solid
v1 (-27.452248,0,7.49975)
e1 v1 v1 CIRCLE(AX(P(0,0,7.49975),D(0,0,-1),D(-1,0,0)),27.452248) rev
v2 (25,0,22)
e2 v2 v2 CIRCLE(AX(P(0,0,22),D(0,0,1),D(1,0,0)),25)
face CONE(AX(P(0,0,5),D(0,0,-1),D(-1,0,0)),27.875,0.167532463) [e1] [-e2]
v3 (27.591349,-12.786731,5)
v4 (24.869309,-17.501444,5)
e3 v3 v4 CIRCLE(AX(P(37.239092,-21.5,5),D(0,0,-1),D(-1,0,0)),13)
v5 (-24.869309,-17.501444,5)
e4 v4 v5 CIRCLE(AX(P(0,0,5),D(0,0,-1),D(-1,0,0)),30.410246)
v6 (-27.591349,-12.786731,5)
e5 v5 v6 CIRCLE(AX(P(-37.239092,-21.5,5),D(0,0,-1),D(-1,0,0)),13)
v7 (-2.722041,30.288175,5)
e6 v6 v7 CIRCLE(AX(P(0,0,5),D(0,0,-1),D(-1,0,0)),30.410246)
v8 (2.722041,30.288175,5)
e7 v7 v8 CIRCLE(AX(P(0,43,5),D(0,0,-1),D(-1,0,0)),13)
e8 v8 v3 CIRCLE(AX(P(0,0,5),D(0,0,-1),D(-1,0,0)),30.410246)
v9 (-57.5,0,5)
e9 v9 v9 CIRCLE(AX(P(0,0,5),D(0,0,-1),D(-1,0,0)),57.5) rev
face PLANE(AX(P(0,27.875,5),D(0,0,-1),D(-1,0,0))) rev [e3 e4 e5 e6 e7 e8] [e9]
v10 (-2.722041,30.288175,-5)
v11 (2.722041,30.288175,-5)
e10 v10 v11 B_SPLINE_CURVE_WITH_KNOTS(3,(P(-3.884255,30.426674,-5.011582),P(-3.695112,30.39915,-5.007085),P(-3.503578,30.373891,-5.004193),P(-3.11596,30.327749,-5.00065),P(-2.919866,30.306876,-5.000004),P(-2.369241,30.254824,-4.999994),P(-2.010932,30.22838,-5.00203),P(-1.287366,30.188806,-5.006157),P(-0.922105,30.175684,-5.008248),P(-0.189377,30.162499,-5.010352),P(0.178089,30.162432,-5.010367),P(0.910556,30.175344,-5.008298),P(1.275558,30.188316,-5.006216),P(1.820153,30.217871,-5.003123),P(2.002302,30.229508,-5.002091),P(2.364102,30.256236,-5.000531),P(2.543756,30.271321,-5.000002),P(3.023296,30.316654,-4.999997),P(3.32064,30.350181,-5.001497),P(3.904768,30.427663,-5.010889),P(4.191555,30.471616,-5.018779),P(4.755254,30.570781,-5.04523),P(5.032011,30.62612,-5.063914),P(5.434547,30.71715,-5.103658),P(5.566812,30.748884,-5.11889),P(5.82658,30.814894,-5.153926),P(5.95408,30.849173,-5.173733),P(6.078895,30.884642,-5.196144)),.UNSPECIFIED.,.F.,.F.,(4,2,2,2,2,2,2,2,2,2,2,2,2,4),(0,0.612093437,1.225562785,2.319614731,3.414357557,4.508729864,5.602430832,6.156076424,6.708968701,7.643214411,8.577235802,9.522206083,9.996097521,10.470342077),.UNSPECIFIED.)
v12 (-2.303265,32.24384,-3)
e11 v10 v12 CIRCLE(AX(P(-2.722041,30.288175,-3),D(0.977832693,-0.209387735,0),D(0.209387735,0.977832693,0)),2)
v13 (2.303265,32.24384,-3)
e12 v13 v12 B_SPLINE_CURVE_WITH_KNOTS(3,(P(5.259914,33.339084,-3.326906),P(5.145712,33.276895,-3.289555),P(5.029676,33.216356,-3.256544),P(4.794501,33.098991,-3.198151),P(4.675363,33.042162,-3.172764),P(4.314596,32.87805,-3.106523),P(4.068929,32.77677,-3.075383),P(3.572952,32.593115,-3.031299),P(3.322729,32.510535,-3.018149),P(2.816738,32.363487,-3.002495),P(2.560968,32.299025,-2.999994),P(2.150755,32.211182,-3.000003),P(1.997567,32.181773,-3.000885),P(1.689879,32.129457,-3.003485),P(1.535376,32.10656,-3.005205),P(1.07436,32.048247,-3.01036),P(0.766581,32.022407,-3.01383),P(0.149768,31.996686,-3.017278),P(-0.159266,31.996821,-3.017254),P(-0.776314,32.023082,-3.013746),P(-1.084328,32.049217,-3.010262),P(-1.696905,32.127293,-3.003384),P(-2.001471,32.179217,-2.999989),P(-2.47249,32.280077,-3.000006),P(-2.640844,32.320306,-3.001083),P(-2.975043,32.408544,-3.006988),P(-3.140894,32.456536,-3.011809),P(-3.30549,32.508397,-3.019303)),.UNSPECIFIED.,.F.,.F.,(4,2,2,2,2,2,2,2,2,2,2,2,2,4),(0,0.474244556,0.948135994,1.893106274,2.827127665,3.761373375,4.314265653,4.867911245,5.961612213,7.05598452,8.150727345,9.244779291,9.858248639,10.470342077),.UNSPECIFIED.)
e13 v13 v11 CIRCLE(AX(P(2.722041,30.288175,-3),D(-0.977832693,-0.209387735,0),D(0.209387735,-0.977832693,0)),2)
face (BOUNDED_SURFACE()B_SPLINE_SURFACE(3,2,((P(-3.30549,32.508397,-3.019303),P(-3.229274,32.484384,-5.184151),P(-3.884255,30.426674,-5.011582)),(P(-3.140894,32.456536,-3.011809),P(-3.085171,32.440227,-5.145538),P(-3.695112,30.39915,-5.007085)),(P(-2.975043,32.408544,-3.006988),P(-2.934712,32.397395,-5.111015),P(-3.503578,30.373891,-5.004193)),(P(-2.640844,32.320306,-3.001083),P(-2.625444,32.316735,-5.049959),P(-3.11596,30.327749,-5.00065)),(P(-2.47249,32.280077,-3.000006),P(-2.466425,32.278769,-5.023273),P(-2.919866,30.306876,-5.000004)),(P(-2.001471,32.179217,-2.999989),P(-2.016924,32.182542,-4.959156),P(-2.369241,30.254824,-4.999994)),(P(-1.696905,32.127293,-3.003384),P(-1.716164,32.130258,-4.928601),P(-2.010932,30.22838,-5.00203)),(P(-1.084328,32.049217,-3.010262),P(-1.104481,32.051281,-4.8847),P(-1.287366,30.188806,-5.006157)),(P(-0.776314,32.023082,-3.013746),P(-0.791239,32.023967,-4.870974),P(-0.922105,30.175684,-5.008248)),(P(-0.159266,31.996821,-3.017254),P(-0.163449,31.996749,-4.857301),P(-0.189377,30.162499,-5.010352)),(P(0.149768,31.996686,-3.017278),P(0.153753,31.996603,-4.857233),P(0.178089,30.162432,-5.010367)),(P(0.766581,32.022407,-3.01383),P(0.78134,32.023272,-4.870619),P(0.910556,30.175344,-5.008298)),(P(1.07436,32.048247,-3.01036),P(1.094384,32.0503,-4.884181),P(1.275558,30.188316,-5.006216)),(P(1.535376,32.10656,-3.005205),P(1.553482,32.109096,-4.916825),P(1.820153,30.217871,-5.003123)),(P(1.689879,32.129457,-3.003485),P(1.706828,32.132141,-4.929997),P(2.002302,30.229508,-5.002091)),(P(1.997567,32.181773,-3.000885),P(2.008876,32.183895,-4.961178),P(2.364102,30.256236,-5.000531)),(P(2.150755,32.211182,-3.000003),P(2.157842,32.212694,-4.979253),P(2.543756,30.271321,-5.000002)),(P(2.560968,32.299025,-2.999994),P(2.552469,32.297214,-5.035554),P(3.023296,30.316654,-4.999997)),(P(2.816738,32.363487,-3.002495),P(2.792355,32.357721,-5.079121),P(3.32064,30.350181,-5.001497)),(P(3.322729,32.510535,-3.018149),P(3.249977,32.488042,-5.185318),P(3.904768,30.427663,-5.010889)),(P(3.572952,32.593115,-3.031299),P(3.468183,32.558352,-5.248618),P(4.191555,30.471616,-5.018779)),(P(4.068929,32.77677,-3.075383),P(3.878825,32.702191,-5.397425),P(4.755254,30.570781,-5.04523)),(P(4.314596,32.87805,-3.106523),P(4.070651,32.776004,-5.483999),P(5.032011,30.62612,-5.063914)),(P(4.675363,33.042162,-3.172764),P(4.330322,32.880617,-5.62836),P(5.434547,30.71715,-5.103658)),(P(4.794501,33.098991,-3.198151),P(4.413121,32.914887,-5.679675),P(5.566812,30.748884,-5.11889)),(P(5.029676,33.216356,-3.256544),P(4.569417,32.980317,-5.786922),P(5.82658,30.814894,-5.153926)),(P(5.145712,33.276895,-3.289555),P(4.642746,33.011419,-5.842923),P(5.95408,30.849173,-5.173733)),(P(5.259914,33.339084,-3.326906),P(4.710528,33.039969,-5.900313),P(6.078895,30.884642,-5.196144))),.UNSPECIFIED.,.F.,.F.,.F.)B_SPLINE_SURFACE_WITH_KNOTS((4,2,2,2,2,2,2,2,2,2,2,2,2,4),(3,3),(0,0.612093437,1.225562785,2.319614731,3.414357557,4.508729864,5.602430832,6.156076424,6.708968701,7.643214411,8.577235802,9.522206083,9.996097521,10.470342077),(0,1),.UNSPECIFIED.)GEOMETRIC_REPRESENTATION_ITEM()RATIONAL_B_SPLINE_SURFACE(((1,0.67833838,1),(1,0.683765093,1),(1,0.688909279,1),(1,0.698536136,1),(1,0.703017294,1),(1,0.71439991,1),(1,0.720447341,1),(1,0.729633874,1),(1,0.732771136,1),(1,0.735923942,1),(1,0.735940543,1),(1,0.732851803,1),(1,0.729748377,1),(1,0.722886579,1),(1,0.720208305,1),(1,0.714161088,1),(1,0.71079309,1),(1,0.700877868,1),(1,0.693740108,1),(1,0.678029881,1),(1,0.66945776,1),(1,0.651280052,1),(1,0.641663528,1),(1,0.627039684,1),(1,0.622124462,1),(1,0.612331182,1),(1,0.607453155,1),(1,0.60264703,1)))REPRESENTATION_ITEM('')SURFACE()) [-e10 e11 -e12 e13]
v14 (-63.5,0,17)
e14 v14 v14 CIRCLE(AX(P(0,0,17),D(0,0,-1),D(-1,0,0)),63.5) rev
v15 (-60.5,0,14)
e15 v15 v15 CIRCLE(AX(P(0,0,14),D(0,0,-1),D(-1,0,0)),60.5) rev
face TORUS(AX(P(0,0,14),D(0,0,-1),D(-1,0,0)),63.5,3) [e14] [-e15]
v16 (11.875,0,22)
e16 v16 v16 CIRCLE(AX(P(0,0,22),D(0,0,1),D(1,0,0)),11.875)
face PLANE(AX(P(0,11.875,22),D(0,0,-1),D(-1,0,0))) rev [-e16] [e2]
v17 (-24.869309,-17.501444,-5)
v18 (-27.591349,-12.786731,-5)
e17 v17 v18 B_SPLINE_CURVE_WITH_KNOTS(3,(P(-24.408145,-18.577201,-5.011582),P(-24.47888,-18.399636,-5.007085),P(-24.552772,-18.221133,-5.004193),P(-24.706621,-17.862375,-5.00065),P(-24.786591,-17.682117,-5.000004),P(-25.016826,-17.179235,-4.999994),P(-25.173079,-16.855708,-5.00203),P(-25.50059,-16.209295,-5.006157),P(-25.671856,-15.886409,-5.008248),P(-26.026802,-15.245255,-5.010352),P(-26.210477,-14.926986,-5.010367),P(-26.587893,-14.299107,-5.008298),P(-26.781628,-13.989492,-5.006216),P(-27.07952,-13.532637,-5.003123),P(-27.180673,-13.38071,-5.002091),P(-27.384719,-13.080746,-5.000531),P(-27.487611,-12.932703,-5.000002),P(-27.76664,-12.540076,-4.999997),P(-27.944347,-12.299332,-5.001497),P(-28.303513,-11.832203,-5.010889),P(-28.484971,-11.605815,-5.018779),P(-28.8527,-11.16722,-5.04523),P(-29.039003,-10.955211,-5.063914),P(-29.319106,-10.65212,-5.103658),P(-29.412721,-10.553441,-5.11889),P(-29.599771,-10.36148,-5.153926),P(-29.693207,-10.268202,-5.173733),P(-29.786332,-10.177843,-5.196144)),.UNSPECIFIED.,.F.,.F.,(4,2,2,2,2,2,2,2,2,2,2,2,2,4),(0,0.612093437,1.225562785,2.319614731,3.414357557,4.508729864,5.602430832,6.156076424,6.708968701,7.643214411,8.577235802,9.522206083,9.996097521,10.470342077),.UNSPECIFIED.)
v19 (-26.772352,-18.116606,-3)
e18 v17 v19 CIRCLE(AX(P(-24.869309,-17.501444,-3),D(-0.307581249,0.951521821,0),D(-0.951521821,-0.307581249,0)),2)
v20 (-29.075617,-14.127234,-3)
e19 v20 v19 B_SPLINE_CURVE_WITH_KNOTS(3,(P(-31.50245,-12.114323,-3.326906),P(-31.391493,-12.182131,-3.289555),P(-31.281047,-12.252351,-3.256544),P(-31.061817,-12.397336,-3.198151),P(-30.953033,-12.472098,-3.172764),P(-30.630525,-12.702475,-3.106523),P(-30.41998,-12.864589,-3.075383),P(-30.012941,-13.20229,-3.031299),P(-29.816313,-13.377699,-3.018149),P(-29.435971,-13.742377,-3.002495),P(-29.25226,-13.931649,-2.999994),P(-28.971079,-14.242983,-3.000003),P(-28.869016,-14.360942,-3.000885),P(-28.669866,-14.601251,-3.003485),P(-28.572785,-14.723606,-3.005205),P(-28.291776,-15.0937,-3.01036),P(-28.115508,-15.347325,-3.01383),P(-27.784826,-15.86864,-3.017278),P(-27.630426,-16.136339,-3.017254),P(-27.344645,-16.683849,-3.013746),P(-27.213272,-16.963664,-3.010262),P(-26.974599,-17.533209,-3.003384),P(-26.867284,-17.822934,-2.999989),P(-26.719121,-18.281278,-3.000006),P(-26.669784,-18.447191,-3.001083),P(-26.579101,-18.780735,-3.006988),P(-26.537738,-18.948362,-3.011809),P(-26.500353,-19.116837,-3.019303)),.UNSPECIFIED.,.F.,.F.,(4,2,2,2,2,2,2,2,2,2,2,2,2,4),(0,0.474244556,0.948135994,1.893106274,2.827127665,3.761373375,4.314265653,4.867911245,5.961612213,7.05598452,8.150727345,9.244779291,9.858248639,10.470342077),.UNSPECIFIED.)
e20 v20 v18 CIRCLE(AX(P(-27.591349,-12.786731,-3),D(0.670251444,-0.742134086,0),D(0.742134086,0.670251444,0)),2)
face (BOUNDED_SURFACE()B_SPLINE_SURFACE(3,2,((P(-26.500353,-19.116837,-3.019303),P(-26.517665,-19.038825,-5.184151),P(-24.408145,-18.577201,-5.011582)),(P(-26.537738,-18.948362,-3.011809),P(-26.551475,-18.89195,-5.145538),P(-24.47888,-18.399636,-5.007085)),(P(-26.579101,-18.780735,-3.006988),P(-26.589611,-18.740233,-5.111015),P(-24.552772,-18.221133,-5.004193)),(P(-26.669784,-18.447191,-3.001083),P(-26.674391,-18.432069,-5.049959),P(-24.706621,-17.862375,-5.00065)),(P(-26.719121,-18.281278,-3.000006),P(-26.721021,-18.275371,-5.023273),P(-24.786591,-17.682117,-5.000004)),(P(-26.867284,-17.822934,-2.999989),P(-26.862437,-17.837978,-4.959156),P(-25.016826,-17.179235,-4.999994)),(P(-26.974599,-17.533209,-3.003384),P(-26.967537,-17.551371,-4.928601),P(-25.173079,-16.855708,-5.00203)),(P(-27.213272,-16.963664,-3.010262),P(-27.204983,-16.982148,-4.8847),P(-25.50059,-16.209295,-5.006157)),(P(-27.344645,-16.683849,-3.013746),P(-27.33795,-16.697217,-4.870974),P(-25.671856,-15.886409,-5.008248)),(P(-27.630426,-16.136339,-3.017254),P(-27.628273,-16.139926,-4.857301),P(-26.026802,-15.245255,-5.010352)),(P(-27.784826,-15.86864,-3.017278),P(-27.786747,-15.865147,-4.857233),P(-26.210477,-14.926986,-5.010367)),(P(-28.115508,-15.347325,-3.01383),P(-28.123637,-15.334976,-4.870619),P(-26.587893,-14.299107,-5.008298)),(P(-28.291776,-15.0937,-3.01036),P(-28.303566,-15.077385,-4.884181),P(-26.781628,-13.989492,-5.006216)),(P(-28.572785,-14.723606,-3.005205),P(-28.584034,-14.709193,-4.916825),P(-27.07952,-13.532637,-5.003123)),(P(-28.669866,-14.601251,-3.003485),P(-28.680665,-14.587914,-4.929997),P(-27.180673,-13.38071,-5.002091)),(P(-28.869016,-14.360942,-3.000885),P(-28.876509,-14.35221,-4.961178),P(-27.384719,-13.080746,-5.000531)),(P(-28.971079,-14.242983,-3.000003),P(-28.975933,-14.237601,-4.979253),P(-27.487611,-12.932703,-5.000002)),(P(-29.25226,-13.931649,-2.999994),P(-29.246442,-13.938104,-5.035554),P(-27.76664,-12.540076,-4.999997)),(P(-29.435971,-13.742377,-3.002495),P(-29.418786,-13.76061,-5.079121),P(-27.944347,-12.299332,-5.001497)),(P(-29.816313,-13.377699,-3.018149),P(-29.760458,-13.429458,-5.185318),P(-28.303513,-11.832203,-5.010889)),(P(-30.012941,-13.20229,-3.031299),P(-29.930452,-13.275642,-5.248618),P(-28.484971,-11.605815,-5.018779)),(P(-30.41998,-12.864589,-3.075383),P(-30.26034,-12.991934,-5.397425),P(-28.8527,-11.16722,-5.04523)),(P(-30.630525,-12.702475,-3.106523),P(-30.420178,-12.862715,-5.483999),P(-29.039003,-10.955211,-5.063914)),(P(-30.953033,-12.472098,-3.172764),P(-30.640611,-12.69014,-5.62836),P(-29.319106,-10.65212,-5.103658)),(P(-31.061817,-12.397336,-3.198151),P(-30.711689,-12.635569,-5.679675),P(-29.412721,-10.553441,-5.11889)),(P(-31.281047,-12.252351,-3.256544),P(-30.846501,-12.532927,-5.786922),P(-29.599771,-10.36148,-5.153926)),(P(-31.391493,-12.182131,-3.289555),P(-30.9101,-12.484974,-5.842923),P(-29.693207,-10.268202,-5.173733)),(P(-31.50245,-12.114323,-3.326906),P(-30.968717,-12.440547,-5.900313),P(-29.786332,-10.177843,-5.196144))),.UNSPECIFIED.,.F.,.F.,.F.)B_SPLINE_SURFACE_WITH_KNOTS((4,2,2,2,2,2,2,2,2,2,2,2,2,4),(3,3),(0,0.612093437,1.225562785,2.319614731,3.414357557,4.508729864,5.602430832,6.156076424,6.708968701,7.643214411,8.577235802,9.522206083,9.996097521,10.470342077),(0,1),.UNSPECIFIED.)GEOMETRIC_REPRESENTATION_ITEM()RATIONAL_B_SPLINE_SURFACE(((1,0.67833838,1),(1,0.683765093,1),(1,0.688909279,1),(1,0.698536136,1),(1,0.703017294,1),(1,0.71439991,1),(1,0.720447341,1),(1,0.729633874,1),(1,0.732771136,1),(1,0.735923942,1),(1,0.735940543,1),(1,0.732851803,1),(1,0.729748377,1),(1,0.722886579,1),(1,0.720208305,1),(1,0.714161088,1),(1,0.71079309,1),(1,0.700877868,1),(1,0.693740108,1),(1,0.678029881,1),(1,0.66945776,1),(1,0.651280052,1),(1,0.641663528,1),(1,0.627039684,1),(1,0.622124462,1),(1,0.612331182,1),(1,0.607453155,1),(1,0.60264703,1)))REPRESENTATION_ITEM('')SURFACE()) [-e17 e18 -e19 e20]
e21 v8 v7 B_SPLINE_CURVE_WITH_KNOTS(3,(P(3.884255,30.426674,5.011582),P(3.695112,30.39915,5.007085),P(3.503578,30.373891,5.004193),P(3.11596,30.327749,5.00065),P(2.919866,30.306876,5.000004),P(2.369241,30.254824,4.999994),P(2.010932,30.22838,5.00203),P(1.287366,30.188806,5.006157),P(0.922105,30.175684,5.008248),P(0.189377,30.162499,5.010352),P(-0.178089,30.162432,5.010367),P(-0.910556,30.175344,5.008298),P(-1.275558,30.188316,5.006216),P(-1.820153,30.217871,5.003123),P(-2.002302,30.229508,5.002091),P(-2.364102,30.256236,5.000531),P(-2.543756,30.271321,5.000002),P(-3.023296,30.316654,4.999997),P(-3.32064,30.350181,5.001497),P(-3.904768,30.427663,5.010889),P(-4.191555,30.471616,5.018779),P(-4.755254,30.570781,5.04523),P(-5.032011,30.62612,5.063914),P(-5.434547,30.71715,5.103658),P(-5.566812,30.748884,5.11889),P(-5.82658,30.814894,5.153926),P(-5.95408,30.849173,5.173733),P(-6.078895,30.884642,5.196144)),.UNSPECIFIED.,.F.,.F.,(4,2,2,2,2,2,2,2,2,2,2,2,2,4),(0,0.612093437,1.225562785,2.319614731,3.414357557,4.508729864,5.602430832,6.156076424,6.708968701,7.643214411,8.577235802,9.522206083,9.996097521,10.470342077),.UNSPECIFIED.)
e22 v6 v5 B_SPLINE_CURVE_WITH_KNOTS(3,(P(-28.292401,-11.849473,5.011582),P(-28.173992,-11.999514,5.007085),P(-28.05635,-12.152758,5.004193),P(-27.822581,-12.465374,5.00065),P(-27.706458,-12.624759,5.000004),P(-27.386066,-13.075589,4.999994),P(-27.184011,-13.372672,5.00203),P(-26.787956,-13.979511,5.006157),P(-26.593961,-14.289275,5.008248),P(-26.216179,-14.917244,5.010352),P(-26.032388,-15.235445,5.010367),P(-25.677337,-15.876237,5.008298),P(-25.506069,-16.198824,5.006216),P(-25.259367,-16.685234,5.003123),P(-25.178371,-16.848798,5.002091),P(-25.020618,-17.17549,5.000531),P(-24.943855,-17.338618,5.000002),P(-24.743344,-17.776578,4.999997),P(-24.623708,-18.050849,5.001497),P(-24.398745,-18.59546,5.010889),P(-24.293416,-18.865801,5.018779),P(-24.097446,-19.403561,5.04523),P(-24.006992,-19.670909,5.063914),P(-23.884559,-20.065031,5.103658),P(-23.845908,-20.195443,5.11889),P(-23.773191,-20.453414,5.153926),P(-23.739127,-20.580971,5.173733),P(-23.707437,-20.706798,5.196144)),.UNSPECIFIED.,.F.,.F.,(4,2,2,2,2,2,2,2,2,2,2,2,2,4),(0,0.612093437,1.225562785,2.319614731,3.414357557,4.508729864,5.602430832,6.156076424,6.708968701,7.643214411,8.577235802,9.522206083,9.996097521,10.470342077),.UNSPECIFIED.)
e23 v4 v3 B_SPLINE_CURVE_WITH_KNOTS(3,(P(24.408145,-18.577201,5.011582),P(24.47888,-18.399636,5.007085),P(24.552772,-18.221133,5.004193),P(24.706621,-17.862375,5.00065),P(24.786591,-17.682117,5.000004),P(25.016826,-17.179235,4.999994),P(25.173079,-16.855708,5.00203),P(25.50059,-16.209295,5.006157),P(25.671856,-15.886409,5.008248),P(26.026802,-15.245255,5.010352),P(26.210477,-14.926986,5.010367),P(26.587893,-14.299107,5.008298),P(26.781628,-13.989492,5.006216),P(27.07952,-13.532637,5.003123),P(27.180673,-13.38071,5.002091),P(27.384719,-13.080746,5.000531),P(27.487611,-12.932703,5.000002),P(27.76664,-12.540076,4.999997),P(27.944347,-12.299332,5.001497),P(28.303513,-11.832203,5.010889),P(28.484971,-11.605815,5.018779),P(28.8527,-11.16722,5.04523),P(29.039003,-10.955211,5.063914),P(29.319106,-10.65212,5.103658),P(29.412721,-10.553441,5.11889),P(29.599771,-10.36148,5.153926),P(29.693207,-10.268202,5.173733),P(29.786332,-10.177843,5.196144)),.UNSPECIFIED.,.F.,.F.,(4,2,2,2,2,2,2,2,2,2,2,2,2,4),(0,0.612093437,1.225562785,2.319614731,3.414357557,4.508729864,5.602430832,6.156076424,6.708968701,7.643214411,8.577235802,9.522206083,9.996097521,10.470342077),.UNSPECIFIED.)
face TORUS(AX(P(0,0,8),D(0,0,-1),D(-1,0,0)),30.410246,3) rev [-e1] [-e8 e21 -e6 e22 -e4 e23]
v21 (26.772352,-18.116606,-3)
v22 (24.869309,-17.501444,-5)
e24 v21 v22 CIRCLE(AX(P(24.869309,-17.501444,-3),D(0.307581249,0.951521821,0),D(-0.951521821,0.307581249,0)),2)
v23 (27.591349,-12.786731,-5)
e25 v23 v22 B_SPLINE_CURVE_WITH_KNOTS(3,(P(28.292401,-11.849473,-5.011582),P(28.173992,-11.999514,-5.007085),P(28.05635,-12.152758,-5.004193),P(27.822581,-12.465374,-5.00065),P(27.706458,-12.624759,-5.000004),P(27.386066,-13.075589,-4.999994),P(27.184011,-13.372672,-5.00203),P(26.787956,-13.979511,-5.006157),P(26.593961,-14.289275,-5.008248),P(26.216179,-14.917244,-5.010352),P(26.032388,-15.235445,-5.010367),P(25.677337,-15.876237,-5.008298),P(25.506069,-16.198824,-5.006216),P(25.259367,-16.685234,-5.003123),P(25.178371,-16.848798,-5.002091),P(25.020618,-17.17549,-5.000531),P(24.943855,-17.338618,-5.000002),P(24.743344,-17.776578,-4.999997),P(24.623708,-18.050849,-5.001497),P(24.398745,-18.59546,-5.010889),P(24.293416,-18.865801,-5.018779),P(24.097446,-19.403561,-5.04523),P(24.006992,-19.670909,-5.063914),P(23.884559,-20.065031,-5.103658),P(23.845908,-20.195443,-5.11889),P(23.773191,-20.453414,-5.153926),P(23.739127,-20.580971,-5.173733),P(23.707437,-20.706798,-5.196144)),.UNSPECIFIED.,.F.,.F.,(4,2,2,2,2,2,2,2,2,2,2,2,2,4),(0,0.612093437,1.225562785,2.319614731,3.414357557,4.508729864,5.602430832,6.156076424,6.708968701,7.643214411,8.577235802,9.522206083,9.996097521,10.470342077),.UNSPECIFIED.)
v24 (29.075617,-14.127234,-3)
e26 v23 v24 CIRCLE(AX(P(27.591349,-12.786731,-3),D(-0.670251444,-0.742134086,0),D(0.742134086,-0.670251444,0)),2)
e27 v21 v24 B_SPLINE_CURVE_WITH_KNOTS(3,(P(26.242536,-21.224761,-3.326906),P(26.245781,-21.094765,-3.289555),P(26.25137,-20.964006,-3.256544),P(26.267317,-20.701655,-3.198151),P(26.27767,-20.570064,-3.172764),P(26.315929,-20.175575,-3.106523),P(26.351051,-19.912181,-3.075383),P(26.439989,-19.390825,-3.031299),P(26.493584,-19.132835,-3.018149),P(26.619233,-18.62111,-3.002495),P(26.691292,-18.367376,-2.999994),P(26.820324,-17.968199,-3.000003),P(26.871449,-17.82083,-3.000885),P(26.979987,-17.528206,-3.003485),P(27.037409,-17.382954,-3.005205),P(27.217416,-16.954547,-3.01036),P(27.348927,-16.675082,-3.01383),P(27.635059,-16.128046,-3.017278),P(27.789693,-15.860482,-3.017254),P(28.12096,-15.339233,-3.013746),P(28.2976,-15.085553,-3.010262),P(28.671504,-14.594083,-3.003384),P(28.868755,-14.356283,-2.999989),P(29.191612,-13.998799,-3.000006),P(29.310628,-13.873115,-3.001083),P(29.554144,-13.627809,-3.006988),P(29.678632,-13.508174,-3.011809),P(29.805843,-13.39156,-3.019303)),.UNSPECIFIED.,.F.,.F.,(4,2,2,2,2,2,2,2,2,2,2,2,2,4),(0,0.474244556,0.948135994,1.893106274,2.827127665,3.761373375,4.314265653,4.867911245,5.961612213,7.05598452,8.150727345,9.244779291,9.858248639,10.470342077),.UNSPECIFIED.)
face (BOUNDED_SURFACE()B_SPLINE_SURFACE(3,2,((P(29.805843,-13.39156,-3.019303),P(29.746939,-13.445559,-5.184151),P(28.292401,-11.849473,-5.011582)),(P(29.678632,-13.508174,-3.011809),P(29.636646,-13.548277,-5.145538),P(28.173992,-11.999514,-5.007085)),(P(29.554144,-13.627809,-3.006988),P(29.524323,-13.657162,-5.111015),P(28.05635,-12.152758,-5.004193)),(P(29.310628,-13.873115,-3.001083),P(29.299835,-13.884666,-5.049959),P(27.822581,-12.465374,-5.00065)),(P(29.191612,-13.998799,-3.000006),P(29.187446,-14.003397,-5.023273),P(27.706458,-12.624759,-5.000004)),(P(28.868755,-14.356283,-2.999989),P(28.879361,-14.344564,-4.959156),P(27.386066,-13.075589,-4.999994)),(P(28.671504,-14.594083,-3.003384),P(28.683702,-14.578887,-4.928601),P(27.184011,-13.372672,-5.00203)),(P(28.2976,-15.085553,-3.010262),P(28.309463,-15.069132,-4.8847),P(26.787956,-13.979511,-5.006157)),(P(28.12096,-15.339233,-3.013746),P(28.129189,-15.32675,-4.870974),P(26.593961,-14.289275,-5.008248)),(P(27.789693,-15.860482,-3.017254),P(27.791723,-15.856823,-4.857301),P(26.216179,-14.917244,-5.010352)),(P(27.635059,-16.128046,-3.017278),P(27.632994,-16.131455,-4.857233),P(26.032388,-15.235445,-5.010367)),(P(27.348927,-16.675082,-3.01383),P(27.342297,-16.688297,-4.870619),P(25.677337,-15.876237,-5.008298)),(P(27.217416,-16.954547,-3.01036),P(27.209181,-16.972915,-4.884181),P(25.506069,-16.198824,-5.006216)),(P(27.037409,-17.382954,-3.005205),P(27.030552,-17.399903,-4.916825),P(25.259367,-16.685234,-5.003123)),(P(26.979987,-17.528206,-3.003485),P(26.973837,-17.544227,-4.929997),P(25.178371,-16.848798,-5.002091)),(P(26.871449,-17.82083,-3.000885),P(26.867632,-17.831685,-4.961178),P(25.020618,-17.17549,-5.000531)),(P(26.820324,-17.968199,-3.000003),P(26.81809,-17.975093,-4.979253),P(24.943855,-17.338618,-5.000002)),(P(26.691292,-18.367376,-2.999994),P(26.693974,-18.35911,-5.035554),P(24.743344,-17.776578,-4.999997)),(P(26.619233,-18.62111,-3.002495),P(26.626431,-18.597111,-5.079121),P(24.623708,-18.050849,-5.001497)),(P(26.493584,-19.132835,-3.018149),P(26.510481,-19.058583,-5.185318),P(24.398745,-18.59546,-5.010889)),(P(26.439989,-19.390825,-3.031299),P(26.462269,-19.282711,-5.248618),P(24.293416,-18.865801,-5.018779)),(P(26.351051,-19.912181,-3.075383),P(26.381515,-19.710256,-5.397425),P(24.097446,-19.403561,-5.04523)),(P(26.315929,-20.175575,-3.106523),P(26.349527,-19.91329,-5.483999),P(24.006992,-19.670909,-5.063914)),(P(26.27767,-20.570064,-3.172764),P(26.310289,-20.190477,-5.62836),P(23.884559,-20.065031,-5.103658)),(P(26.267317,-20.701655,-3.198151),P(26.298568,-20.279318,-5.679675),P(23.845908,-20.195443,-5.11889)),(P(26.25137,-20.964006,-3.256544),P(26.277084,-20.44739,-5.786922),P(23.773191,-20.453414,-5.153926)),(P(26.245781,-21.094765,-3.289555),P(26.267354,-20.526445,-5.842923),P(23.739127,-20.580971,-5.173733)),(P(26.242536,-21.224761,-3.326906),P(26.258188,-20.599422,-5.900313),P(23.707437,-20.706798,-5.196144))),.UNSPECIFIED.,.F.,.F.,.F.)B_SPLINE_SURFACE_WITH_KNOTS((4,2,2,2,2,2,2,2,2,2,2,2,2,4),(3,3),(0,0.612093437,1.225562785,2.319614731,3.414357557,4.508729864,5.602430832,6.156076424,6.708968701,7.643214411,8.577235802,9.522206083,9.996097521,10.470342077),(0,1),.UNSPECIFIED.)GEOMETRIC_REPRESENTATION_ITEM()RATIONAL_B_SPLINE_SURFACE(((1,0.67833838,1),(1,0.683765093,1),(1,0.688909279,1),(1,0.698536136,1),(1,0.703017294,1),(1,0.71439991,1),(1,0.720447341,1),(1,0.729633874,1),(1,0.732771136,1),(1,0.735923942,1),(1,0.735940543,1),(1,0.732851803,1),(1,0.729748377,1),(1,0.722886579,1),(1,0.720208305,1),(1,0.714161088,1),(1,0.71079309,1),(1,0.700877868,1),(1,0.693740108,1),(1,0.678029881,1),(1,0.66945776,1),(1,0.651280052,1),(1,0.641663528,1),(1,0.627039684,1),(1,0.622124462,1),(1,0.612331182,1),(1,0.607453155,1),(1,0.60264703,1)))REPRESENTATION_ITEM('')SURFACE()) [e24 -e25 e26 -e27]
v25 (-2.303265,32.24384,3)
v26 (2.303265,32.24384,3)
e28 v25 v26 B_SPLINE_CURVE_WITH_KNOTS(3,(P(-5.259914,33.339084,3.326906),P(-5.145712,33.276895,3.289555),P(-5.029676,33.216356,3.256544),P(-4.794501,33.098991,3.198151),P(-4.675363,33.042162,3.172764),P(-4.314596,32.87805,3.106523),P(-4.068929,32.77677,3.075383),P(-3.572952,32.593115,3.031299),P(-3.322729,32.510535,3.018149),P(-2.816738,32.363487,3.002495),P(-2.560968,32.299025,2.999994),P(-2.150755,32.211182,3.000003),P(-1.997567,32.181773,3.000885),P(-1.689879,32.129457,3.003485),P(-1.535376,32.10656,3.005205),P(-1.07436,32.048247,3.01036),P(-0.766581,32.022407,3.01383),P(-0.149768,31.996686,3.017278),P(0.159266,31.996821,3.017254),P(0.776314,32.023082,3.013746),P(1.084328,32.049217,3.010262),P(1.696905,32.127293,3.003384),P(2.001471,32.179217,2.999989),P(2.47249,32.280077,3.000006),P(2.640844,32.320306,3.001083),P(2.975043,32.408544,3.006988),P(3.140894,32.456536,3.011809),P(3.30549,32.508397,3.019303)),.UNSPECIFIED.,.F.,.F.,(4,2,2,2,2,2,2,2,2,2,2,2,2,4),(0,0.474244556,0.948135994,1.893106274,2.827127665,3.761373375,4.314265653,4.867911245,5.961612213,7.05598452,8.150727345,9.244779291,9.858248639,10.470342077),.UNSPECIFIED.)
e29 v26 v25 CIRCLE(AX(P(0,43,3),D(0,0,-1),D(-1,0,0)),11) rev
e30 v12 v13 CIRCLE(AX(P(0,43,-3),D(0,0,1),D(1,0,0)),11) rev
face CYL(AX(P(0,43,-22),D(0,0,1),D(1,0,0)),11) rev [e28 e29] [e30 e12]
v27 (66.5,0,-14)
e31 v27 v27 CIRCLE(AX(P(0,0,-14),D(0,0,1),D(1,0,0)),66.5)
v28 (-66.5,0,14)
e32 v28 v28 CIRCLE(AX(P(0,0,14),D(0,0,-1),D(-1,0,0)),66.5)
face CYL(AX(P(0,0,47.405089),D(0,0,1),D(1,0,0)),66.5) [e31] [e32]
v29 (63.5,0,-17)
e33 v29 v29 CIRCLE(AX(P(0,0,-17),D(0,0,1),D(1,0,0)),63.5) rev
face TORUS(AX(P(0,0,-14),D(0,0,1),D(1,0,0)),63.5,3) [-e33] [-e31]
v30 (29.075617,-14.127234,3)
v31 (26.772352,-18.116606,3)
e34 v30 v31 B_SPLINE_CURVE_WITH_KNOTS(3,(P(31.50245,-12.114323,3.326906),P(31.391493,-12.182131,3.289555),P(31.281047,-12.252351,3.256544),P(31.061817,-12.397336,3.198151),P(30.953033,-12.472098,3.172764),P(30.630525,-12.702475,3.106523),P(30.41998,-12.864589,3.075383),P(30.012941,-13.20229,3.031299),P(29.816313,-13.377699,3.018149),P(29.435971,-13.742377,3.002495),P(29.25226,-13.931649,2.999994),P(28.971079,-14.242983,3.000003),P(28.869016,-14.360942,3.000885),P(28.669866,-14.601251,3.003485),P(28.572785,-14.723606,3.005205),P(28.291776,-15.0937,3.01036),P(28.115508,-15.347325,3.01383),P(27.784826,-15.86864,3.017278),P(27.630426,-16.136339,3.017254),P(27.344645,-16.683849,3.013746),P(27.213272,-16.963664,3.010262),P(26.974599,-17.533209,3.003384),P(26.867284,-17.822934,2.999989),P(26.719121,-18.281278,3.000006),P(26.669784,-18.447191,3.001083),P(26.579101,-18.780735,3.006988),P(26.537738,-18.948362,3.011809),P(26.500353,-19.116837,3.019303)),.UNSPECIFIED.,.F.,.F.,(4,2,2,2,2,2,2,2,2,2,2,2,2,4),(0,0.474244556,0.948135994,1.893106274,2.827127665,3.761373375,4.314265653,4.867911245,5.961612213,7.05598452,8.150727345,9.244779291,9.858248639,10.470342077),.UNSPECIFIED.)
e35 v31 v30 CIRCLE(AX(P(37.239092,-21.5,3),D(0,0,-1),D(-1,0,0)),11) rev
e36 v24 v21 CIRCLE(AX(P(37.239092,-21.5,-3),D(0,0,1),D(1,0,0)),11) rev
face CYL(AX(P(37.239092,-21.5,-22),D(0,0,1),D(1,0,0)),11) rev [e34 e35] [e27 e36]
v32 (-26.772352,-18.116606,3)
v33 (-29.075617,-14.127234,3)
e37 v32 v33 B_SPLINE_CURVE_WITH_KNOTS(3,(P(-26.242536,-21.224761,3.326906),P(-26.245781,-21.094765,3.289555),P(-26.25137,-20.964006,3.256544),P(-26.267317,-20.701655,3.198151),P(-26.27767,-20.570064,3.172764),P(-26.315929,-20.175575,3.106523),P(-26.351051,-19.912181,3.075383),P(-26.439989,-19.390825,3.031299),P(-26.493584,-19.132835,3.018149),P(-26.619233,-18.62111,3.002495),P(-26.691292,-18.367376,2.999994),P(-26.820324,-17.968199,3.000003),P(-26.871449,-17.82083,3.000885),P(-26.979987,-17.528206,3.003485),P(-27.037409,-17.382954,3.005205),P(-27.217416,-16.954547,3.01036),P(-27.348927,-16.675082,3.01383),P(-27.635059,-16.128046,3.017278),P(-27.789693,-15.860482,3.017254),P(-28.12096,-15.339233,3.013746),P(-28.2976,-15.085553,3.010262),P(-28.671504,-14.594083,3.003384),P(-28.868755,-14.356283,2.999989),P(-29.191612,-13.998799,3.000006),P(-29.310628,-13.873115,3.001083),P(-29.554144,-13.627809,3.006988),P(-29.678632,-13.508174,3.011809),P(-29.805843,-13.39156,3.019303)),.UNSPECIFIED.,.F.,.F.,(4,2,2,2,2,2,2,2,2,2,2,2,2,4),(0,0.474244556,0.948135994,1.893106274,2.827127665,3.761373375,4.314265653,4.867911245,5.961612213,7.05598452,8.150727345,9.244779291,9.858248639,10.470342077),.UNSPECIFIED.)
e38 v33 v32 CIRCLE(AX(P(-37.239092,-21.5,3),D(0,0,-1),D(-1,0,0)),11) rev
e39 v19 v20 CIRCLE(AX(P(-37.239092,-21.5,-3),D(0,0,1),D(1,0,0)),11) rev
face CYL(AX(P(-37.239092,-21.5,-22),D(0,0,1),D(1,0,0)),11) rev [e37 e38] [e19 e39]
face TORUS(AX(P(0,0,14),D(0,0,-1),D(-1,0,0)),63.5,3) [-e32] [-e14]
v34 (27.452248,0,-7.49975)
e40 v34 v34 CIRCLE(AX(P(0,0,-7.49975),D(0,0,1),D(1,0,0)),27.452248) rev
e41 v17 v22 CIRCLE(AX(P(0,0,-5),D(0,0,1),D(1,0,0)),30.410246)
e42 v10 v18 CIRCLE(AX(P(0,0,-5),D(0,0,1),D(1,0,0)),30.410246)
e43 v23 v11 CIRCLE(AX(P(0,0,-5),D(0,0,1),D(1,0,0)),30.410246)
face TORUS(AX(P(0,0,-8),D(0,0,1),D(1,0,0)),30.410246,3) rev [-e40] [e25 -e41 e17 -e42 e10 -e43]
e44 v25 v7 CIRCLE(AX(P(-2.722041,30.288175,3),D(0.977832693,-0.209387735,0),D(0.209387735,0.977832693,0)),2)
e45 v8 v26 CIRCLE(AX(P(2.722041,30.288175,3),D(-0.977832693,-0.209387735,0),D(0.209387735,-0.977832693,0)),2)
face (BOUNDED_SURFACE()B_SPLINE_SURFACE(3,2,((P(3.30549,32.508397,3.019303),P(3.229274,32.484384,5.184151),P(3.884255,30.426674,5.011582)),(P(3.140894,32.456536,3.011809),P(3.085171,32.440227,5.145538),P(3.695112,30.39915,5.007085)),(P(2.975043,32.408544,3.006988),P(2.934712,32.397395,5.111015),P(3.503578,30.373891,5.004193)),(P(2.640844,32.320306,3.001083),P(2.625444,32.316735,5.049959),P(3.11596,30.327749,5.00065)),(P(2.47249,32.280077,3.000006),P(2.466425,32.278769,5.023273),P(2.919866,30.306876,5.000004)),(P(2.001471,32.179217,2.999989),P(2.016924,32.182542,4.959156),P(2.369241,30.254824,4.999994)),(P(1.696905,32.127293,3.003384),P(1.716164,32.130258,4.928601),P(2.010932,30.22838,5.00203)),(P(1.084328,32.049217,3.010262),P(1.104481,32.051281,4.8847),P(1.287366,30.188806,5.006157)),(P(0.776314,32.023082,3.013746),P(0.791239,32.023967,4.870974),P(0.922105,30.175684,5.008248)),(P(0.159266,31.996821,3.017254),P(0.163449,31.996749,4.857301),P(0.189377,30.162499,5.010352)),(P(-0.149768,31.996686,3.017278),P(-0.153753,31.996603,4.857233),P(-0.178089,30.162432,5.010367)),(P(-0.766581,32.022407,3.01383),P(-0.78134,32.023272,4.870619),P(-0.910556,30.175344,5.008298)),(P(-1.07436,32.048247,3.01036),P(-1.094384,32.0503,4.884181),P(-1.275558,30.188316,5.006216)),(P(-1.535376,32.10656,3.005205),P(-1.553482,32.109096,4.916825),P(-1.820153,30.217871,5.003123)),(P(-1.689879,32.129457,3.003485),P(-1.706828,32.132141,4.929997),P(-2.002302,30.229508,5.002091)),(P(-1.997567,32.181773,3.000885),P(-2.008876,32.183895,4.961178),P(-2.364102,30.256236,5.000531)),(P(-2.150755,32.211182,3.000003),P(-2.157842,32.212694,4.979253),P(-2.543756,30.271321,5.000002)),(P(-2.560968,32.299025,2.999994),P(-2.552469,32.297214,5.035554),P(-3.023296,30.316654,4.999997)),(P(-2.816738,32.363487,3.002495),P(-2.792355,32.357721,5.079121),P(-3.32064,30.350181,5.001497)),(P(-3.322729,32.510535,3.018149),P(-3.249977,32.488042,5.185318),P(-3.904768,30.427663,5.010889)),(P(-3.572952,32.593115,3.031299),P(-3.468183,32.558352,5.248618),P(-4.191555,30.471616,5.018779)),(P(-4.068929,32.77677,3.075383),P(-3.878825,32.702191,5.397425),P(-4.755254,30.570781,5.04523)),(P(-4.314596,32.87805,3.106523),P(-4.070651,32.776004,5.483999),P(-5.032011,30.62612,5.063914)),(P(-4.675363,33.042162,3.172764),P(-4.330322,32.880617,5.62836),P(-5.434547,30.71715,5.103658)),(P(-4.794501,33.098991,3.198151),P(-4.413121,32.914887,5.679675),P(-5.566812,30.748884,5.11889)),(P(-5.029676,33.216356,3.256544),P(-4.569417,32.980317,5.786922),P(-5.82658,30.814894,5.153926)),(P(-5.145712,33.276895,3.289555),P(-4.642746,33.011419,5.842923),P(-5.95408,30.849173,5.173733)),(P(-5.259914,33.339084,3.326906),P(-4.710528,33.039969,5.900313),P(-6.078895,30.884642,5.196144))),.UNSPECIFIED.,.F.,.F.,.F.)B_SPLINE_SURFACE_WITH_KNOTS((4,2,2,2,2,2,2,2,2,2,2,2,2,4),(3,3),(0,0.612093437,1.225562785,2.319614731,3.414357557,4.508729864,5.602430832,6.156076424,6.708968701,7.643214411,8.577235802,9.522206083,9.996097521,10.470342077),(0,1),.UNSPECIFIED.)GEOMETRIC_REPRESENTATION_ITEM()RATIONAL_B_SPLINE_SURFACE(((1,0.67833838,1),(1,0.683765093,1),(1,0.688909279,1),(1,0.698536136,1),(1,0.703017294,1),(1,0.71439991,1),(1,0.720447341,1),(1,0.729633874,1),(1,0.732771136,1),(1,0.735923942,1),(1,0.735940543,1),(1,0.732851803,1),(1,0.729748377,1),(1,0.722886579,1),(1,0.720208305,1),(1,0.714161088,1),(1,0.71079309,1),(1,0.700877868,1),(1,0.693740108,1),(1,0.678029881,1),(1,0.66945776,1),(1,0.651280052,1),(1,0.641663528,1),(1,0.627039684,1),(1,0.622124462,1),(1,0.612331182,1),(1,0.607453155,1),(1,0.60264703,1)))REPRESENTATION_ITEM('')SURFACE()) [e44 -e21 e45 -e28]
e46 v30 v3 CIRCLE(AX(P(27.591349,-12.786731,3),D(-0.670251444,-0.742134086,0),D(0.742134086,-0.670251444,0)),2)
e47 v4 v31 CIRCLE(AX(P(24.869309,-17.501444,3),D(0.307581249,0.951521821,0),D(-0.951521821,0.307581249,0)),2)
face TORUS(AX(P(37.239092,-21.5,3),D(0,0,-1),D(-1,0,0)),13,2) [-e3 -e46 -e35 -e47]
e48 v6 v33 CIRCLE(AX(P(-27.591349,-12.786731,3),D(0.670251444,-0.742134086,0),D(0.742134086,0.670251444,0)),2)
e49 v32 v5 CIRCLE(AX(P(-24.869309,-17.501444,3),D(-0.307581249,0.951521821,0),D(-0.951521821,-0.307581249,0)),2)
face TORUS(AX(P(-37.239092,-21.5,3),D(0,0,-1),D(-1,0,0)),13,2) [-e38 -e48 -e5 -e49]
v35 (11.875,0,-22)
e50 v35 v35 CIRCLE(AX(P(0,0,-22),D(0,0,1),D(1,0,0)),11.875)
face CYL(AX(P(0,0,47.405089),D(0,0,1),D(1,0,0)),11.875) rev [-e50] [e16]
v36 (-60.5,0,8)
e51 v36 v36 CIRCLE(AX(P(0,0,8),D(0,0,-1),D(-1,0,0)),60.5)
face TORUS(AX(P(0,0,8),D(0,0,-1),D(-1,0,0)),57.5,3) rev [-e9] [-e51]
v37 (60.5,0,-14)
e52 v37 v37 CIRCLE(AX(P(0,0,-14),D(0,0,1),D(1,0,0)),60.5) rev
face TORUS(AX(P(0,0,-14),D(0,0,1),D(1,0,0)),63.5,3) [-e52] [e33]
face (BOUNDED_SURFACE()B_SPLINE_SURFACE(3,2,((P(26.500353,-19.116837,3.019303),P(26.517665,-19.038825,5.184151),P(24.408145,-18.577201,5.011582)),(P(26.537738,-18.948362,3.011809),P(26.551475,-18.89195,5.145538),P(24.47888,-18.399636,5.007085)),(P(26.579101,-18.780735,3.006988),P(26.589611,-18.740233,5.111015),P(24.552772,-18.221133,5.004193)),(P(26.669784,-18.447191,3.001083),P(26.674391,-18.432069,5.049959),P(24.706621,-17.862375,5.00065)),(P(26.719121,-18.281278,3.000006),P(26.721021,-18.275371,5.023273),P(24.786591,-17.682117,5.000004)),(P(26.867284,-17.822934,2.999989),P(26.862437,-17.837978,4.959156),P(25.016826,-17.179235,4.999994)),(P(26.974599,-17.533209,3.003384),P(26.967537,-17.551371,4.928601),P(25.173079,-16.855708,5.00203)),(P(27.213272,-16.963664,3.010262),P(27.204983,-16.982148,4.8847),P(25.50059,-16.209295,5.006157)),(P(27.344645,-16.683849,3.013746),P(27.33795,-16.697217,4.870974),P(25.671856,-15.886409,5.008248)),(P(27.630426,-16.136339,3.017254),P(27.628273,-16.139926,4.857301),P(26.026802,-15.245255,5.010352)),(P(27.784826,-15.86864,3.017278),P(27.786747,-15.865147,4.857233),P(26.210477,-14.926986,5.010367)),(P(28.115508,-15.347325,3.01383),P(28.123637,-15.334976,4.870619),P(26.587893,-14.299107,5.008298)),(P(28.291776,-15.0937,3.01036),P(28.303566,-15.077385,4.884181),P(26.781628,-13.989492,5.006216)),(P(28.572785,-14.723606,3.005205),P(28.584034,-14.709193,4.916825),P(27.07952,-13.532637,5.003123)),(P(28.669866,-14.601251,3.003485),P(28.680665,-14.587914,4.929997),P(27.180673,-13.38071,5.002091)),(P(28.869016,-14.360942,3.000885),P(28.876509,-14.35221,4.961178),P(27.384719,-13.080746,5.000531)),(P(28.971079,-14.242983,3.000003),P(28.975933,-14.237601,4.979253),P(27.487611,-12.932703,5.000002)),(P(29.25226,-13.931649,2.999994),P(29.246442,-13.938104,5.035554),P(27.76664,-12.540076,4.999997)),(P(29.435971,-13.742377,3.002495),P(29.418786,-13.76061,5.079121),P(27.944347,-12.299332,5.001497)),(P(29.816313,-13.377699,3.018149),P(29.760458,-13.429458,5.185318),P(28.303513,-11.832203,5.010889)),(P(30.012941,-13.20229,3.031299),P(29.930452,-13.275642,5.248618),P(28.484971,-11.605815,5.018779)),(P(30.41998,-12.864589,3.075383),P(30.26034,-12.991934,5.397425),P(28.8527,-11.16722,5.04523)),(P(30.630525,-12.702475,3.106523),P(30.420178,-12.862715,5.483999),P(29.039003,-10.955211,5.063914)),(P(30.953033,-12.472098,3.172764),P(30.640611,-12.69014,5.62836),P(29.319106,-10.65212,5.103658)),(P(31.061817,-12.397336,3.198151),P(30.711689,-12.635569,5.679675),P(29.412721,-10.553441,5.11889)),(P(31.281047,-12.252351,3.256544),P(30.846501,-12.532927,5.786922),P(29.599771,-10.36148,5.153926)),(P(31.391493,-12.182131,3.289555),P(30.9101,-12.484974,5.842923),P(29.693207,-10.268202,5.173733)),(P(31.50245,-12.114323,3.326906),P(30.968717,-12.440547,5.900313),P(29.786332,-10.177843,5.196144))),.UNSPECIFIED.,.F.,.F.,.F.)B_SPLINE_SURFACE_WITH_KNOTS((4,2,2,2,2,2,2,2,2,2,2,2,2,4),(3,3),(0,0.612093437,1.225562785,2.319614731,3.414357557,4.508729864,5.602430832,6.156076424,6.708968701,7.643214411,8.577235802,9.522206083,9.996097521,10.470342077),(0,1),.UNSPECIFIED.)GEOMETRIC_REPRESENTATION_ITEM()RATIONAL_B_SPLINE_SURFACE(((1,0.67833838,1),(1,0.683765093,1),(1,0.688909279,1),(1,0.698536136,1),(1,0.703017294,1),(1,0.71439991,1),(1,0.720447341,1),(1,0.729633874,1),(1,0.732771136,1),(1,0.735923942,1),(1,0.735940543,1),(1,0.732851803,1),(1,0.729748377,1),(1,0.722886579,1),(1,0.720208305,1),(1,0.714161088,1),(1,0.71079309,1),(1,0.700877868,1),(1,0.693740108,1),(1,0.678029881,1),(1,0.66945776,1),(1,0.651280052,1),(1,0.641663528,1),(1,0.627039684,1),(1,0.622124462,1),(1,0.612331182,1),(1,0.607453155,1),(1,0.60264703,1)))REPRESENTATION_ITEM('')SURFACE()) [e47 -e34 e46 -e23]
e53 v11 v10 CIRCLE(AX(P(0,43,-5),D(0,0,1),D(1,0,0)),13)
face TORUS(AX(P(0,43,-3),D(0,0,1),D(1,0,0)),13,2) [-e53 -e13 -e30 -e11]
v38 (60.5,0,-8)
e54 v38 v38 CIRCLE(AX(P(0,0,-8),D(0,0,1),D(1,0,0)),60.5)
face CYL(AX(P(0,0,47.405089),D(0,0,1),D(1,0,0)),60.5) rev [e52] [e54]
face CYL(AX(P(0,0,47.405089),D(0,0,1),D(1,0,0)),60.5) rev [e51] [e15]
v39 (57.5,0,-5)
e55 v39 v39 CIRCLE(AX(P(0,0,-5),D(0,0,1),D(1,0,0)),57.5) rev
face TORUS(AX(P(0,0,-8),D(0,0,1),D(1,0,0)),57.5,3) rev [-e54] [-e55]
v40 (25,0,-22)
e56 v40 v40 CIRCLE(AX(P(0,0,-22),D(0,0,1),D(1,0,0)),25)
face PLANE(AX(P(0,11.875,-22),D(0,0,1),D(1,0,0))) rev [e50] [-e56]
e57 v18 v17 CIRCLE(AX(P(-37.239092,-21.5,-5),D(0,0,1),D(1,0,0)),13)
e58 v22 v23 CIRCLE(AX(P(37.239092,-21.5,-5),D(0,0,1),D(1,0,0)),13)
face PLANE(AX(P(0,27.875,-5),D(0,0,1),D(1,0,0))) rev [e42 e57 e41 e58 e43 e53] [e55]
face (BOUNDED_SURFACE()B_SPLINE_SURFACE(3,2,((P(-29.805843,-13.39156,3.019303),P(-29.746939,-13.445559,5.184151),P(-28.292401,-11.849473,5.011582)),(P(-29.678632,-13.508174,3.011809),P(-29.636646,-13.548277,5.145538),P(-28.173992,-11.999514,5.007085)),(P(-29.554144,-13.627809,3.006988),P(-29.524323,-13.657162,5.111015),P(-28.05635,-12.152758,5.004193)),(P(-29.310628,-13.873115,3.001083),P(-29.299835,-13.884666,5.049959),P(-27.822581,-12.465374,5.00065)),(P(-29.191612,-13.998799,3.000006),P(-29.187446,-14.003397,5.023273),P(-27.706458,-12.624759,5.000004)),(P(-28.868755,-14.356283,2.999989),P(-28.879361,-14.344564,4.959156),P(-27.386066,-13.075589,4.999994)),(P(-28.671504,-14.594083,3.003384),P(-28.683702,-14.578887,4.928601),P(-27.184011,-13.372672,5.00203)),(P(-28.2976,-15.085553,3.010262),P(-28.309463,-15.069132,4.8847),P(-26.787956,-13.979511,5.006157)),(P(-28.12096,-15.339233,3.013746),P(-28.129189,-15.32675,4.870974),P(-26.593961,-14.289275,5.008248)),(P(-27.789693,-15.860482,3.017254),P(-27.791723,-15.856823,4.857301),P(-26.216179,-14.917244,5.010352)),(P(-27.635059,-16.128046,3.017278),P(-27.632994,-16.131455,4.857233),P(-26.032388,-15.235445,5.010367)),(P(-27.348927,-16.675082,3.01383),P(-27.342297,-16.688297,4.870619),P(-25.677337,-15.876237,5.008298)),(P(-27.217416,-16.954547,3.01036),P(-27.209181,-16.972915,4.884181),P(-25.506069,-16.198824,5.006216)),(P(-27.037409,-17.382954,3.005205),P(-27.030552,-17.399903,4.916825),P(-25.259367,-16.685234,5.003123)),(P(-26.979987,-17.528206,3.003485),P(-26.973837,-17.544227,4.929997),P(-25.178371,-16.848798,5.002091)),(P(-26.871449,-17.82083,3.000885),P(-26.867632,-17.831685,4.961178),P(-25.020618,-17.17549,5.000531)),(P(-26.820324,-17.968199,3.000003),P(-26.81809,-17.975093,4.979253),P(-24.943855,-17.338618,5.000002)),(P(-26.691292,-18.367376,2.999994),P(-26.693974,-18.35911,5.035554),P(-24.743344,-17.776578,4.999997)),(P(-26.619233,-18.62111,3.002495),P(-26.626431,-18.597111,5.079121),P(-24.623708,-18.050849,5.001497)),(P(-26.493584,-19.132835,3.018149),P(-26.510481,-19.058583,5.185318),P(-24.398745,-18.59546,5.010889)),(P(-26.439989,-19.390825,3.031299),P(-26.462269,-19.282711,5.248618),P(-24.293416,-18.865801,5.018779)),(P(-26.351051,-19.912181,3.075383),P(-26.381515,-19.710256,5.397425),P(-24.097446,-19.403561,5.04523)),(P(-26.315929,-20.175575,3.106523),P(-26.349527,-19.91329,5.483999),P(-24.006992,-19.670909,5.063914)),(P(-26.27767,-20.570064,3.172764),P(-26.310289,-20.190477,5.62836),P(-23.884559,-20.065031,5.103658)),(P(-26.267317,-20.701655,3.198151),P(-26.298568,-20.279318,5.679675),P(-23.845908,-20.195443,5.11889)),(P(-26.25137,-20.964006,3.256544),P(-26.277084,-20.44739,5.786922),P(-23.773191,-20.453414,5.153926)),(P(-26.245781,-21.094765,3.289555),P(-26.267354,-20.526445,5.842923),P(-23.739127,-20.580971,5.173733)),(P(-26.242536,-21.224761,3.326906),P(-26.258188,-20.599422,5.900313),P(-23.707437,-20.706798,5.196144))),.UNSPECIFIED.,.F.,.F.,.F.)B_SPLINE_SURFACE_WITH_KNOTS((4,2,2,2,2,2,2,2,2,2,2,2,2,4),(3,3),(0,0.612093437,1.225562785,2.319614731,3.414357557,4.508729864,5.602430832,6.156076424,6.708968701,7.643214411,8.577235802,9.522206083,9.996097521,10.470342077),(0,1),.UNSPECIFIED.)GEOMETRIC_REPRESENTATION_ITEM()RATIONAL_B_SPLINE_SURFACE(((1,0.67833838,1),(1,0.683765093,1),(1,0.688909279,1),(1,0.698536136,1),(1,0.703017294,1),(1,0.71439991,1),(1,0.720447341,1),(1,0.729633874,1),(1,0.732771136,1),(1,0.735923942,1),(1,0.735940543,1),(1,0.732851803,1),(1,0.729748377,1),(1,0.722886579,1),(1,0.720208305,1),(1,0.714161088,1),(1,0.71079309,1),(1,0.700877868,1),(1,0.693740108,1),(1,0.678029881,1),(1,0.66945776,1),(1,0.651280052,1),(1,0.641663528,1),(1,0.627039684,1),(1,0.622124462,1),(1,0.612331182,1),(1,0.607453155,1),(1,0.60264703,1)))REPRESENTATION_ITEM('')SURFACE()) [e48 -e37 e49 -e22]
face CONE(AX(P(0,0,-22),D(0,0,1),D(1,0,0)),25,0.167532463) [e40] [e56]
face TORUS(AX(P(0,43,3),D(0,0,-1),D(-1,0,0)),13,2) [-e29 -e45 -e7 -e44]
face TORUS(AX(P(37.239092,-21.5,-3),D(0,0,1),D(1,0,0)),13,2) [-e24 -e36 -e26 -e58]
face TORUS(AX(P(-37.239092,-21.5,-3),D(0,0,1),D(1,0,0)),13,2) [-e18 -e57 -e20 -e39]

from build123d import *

# Parameters (mm, degrees)
CUT_EXTRUDE1_START     = -5
CUT_EXTRUDE1_OUTLINE_R = 11
CUT_EXTRUDE1_DEPTH     = 10
CIRPATTERN1_COUNT      = 3
FILLET1_R              = 3
FILLET2_R              = 3
FILLET3_R              = 2


# Read off the part's stored shape, not the designer's step: Revolve1, Cut-Extrude1
with BuildPart() as part:
    # Revolve1 outline → Revolve1 (revolve)
    with BuildSketch(Plane.XZ):
        Polygon((11.875, -22), (25, -22), (27.875, -5), (60.5, -5), (60.5, -17), (66.5, -17), (66.5, 17), (60.5, 17), (60.5, 5), (27.875, 5), (25, 22), (11.875, 22), align=None)
    revolve(axis=Axis((0, 0, 0), (0, 0, 1)))

    # Cut-Extrude1 outline → Cut-Extrude1 (cut)
    with BuildSketch(Plane.XY.offset(CUT_EXTRUDE1_START)):
        with Locations((0, 43)):
            Circle(CUT_EXTRUDE1_OUTLINE_R)
    cut_extrude1 = extrude(amount=CUT_EXTRUDE1_DEPTH, mode=Mode.SUBTRACT)

    # CirPattern1: Cut-Extrude1 ×3 about axis
    cirpattern1_axis = Axis((0, 0, 0), (0, 0, 1))
    for i in range(1, CIRPATTERN1_COUNT):
        add(cut_extrude1.rotate(cirpattern1_axis, i * 360 / CIRPATTERN1_COUNT), mode=Mode.SUBTRACT)

    # Fillet1
    fillet1_edges = [part.edges().sort_by_distance(p)[0] for p in [
        (-66.5, 0, 17),
        (-60.5, 0, 17),
        (-60.5, 0, -17),
        (-66.5, 0, -17),
    ]]
    fillet(fillet1_edges, radius=FILLET1_R - 0.0001)  # a hair under: the kernel refuses the full size

    # Fillet2
    fillet2_edges = [part.edges().sort_by_distance(p)[0] for p in [
        (-60.5, 0, 5),
        (-27.875, 0, 5),
        (-27.875, 0, -5),
        (-60.5, 0, -5),
    ]]
    fillet(fillet2_edges, radius=FILLET2_R)

    # Fillet3
    fillet3_edges = [part.edges().sort_by_distance(p)[0] for p in [
        (-11, 43, -5),
        (-11, 43, 5),
        (-31.739092363, -31.026279442, -5),
        (-31.739092363, -31.026279442, 5),
        (42.739092363, -11.973720558, -5),
        (42.739092363, -11.973720558, 5),
    ]]
    fillet(fillet3_edges, radius=FILLET3_R)


solid = part.part
